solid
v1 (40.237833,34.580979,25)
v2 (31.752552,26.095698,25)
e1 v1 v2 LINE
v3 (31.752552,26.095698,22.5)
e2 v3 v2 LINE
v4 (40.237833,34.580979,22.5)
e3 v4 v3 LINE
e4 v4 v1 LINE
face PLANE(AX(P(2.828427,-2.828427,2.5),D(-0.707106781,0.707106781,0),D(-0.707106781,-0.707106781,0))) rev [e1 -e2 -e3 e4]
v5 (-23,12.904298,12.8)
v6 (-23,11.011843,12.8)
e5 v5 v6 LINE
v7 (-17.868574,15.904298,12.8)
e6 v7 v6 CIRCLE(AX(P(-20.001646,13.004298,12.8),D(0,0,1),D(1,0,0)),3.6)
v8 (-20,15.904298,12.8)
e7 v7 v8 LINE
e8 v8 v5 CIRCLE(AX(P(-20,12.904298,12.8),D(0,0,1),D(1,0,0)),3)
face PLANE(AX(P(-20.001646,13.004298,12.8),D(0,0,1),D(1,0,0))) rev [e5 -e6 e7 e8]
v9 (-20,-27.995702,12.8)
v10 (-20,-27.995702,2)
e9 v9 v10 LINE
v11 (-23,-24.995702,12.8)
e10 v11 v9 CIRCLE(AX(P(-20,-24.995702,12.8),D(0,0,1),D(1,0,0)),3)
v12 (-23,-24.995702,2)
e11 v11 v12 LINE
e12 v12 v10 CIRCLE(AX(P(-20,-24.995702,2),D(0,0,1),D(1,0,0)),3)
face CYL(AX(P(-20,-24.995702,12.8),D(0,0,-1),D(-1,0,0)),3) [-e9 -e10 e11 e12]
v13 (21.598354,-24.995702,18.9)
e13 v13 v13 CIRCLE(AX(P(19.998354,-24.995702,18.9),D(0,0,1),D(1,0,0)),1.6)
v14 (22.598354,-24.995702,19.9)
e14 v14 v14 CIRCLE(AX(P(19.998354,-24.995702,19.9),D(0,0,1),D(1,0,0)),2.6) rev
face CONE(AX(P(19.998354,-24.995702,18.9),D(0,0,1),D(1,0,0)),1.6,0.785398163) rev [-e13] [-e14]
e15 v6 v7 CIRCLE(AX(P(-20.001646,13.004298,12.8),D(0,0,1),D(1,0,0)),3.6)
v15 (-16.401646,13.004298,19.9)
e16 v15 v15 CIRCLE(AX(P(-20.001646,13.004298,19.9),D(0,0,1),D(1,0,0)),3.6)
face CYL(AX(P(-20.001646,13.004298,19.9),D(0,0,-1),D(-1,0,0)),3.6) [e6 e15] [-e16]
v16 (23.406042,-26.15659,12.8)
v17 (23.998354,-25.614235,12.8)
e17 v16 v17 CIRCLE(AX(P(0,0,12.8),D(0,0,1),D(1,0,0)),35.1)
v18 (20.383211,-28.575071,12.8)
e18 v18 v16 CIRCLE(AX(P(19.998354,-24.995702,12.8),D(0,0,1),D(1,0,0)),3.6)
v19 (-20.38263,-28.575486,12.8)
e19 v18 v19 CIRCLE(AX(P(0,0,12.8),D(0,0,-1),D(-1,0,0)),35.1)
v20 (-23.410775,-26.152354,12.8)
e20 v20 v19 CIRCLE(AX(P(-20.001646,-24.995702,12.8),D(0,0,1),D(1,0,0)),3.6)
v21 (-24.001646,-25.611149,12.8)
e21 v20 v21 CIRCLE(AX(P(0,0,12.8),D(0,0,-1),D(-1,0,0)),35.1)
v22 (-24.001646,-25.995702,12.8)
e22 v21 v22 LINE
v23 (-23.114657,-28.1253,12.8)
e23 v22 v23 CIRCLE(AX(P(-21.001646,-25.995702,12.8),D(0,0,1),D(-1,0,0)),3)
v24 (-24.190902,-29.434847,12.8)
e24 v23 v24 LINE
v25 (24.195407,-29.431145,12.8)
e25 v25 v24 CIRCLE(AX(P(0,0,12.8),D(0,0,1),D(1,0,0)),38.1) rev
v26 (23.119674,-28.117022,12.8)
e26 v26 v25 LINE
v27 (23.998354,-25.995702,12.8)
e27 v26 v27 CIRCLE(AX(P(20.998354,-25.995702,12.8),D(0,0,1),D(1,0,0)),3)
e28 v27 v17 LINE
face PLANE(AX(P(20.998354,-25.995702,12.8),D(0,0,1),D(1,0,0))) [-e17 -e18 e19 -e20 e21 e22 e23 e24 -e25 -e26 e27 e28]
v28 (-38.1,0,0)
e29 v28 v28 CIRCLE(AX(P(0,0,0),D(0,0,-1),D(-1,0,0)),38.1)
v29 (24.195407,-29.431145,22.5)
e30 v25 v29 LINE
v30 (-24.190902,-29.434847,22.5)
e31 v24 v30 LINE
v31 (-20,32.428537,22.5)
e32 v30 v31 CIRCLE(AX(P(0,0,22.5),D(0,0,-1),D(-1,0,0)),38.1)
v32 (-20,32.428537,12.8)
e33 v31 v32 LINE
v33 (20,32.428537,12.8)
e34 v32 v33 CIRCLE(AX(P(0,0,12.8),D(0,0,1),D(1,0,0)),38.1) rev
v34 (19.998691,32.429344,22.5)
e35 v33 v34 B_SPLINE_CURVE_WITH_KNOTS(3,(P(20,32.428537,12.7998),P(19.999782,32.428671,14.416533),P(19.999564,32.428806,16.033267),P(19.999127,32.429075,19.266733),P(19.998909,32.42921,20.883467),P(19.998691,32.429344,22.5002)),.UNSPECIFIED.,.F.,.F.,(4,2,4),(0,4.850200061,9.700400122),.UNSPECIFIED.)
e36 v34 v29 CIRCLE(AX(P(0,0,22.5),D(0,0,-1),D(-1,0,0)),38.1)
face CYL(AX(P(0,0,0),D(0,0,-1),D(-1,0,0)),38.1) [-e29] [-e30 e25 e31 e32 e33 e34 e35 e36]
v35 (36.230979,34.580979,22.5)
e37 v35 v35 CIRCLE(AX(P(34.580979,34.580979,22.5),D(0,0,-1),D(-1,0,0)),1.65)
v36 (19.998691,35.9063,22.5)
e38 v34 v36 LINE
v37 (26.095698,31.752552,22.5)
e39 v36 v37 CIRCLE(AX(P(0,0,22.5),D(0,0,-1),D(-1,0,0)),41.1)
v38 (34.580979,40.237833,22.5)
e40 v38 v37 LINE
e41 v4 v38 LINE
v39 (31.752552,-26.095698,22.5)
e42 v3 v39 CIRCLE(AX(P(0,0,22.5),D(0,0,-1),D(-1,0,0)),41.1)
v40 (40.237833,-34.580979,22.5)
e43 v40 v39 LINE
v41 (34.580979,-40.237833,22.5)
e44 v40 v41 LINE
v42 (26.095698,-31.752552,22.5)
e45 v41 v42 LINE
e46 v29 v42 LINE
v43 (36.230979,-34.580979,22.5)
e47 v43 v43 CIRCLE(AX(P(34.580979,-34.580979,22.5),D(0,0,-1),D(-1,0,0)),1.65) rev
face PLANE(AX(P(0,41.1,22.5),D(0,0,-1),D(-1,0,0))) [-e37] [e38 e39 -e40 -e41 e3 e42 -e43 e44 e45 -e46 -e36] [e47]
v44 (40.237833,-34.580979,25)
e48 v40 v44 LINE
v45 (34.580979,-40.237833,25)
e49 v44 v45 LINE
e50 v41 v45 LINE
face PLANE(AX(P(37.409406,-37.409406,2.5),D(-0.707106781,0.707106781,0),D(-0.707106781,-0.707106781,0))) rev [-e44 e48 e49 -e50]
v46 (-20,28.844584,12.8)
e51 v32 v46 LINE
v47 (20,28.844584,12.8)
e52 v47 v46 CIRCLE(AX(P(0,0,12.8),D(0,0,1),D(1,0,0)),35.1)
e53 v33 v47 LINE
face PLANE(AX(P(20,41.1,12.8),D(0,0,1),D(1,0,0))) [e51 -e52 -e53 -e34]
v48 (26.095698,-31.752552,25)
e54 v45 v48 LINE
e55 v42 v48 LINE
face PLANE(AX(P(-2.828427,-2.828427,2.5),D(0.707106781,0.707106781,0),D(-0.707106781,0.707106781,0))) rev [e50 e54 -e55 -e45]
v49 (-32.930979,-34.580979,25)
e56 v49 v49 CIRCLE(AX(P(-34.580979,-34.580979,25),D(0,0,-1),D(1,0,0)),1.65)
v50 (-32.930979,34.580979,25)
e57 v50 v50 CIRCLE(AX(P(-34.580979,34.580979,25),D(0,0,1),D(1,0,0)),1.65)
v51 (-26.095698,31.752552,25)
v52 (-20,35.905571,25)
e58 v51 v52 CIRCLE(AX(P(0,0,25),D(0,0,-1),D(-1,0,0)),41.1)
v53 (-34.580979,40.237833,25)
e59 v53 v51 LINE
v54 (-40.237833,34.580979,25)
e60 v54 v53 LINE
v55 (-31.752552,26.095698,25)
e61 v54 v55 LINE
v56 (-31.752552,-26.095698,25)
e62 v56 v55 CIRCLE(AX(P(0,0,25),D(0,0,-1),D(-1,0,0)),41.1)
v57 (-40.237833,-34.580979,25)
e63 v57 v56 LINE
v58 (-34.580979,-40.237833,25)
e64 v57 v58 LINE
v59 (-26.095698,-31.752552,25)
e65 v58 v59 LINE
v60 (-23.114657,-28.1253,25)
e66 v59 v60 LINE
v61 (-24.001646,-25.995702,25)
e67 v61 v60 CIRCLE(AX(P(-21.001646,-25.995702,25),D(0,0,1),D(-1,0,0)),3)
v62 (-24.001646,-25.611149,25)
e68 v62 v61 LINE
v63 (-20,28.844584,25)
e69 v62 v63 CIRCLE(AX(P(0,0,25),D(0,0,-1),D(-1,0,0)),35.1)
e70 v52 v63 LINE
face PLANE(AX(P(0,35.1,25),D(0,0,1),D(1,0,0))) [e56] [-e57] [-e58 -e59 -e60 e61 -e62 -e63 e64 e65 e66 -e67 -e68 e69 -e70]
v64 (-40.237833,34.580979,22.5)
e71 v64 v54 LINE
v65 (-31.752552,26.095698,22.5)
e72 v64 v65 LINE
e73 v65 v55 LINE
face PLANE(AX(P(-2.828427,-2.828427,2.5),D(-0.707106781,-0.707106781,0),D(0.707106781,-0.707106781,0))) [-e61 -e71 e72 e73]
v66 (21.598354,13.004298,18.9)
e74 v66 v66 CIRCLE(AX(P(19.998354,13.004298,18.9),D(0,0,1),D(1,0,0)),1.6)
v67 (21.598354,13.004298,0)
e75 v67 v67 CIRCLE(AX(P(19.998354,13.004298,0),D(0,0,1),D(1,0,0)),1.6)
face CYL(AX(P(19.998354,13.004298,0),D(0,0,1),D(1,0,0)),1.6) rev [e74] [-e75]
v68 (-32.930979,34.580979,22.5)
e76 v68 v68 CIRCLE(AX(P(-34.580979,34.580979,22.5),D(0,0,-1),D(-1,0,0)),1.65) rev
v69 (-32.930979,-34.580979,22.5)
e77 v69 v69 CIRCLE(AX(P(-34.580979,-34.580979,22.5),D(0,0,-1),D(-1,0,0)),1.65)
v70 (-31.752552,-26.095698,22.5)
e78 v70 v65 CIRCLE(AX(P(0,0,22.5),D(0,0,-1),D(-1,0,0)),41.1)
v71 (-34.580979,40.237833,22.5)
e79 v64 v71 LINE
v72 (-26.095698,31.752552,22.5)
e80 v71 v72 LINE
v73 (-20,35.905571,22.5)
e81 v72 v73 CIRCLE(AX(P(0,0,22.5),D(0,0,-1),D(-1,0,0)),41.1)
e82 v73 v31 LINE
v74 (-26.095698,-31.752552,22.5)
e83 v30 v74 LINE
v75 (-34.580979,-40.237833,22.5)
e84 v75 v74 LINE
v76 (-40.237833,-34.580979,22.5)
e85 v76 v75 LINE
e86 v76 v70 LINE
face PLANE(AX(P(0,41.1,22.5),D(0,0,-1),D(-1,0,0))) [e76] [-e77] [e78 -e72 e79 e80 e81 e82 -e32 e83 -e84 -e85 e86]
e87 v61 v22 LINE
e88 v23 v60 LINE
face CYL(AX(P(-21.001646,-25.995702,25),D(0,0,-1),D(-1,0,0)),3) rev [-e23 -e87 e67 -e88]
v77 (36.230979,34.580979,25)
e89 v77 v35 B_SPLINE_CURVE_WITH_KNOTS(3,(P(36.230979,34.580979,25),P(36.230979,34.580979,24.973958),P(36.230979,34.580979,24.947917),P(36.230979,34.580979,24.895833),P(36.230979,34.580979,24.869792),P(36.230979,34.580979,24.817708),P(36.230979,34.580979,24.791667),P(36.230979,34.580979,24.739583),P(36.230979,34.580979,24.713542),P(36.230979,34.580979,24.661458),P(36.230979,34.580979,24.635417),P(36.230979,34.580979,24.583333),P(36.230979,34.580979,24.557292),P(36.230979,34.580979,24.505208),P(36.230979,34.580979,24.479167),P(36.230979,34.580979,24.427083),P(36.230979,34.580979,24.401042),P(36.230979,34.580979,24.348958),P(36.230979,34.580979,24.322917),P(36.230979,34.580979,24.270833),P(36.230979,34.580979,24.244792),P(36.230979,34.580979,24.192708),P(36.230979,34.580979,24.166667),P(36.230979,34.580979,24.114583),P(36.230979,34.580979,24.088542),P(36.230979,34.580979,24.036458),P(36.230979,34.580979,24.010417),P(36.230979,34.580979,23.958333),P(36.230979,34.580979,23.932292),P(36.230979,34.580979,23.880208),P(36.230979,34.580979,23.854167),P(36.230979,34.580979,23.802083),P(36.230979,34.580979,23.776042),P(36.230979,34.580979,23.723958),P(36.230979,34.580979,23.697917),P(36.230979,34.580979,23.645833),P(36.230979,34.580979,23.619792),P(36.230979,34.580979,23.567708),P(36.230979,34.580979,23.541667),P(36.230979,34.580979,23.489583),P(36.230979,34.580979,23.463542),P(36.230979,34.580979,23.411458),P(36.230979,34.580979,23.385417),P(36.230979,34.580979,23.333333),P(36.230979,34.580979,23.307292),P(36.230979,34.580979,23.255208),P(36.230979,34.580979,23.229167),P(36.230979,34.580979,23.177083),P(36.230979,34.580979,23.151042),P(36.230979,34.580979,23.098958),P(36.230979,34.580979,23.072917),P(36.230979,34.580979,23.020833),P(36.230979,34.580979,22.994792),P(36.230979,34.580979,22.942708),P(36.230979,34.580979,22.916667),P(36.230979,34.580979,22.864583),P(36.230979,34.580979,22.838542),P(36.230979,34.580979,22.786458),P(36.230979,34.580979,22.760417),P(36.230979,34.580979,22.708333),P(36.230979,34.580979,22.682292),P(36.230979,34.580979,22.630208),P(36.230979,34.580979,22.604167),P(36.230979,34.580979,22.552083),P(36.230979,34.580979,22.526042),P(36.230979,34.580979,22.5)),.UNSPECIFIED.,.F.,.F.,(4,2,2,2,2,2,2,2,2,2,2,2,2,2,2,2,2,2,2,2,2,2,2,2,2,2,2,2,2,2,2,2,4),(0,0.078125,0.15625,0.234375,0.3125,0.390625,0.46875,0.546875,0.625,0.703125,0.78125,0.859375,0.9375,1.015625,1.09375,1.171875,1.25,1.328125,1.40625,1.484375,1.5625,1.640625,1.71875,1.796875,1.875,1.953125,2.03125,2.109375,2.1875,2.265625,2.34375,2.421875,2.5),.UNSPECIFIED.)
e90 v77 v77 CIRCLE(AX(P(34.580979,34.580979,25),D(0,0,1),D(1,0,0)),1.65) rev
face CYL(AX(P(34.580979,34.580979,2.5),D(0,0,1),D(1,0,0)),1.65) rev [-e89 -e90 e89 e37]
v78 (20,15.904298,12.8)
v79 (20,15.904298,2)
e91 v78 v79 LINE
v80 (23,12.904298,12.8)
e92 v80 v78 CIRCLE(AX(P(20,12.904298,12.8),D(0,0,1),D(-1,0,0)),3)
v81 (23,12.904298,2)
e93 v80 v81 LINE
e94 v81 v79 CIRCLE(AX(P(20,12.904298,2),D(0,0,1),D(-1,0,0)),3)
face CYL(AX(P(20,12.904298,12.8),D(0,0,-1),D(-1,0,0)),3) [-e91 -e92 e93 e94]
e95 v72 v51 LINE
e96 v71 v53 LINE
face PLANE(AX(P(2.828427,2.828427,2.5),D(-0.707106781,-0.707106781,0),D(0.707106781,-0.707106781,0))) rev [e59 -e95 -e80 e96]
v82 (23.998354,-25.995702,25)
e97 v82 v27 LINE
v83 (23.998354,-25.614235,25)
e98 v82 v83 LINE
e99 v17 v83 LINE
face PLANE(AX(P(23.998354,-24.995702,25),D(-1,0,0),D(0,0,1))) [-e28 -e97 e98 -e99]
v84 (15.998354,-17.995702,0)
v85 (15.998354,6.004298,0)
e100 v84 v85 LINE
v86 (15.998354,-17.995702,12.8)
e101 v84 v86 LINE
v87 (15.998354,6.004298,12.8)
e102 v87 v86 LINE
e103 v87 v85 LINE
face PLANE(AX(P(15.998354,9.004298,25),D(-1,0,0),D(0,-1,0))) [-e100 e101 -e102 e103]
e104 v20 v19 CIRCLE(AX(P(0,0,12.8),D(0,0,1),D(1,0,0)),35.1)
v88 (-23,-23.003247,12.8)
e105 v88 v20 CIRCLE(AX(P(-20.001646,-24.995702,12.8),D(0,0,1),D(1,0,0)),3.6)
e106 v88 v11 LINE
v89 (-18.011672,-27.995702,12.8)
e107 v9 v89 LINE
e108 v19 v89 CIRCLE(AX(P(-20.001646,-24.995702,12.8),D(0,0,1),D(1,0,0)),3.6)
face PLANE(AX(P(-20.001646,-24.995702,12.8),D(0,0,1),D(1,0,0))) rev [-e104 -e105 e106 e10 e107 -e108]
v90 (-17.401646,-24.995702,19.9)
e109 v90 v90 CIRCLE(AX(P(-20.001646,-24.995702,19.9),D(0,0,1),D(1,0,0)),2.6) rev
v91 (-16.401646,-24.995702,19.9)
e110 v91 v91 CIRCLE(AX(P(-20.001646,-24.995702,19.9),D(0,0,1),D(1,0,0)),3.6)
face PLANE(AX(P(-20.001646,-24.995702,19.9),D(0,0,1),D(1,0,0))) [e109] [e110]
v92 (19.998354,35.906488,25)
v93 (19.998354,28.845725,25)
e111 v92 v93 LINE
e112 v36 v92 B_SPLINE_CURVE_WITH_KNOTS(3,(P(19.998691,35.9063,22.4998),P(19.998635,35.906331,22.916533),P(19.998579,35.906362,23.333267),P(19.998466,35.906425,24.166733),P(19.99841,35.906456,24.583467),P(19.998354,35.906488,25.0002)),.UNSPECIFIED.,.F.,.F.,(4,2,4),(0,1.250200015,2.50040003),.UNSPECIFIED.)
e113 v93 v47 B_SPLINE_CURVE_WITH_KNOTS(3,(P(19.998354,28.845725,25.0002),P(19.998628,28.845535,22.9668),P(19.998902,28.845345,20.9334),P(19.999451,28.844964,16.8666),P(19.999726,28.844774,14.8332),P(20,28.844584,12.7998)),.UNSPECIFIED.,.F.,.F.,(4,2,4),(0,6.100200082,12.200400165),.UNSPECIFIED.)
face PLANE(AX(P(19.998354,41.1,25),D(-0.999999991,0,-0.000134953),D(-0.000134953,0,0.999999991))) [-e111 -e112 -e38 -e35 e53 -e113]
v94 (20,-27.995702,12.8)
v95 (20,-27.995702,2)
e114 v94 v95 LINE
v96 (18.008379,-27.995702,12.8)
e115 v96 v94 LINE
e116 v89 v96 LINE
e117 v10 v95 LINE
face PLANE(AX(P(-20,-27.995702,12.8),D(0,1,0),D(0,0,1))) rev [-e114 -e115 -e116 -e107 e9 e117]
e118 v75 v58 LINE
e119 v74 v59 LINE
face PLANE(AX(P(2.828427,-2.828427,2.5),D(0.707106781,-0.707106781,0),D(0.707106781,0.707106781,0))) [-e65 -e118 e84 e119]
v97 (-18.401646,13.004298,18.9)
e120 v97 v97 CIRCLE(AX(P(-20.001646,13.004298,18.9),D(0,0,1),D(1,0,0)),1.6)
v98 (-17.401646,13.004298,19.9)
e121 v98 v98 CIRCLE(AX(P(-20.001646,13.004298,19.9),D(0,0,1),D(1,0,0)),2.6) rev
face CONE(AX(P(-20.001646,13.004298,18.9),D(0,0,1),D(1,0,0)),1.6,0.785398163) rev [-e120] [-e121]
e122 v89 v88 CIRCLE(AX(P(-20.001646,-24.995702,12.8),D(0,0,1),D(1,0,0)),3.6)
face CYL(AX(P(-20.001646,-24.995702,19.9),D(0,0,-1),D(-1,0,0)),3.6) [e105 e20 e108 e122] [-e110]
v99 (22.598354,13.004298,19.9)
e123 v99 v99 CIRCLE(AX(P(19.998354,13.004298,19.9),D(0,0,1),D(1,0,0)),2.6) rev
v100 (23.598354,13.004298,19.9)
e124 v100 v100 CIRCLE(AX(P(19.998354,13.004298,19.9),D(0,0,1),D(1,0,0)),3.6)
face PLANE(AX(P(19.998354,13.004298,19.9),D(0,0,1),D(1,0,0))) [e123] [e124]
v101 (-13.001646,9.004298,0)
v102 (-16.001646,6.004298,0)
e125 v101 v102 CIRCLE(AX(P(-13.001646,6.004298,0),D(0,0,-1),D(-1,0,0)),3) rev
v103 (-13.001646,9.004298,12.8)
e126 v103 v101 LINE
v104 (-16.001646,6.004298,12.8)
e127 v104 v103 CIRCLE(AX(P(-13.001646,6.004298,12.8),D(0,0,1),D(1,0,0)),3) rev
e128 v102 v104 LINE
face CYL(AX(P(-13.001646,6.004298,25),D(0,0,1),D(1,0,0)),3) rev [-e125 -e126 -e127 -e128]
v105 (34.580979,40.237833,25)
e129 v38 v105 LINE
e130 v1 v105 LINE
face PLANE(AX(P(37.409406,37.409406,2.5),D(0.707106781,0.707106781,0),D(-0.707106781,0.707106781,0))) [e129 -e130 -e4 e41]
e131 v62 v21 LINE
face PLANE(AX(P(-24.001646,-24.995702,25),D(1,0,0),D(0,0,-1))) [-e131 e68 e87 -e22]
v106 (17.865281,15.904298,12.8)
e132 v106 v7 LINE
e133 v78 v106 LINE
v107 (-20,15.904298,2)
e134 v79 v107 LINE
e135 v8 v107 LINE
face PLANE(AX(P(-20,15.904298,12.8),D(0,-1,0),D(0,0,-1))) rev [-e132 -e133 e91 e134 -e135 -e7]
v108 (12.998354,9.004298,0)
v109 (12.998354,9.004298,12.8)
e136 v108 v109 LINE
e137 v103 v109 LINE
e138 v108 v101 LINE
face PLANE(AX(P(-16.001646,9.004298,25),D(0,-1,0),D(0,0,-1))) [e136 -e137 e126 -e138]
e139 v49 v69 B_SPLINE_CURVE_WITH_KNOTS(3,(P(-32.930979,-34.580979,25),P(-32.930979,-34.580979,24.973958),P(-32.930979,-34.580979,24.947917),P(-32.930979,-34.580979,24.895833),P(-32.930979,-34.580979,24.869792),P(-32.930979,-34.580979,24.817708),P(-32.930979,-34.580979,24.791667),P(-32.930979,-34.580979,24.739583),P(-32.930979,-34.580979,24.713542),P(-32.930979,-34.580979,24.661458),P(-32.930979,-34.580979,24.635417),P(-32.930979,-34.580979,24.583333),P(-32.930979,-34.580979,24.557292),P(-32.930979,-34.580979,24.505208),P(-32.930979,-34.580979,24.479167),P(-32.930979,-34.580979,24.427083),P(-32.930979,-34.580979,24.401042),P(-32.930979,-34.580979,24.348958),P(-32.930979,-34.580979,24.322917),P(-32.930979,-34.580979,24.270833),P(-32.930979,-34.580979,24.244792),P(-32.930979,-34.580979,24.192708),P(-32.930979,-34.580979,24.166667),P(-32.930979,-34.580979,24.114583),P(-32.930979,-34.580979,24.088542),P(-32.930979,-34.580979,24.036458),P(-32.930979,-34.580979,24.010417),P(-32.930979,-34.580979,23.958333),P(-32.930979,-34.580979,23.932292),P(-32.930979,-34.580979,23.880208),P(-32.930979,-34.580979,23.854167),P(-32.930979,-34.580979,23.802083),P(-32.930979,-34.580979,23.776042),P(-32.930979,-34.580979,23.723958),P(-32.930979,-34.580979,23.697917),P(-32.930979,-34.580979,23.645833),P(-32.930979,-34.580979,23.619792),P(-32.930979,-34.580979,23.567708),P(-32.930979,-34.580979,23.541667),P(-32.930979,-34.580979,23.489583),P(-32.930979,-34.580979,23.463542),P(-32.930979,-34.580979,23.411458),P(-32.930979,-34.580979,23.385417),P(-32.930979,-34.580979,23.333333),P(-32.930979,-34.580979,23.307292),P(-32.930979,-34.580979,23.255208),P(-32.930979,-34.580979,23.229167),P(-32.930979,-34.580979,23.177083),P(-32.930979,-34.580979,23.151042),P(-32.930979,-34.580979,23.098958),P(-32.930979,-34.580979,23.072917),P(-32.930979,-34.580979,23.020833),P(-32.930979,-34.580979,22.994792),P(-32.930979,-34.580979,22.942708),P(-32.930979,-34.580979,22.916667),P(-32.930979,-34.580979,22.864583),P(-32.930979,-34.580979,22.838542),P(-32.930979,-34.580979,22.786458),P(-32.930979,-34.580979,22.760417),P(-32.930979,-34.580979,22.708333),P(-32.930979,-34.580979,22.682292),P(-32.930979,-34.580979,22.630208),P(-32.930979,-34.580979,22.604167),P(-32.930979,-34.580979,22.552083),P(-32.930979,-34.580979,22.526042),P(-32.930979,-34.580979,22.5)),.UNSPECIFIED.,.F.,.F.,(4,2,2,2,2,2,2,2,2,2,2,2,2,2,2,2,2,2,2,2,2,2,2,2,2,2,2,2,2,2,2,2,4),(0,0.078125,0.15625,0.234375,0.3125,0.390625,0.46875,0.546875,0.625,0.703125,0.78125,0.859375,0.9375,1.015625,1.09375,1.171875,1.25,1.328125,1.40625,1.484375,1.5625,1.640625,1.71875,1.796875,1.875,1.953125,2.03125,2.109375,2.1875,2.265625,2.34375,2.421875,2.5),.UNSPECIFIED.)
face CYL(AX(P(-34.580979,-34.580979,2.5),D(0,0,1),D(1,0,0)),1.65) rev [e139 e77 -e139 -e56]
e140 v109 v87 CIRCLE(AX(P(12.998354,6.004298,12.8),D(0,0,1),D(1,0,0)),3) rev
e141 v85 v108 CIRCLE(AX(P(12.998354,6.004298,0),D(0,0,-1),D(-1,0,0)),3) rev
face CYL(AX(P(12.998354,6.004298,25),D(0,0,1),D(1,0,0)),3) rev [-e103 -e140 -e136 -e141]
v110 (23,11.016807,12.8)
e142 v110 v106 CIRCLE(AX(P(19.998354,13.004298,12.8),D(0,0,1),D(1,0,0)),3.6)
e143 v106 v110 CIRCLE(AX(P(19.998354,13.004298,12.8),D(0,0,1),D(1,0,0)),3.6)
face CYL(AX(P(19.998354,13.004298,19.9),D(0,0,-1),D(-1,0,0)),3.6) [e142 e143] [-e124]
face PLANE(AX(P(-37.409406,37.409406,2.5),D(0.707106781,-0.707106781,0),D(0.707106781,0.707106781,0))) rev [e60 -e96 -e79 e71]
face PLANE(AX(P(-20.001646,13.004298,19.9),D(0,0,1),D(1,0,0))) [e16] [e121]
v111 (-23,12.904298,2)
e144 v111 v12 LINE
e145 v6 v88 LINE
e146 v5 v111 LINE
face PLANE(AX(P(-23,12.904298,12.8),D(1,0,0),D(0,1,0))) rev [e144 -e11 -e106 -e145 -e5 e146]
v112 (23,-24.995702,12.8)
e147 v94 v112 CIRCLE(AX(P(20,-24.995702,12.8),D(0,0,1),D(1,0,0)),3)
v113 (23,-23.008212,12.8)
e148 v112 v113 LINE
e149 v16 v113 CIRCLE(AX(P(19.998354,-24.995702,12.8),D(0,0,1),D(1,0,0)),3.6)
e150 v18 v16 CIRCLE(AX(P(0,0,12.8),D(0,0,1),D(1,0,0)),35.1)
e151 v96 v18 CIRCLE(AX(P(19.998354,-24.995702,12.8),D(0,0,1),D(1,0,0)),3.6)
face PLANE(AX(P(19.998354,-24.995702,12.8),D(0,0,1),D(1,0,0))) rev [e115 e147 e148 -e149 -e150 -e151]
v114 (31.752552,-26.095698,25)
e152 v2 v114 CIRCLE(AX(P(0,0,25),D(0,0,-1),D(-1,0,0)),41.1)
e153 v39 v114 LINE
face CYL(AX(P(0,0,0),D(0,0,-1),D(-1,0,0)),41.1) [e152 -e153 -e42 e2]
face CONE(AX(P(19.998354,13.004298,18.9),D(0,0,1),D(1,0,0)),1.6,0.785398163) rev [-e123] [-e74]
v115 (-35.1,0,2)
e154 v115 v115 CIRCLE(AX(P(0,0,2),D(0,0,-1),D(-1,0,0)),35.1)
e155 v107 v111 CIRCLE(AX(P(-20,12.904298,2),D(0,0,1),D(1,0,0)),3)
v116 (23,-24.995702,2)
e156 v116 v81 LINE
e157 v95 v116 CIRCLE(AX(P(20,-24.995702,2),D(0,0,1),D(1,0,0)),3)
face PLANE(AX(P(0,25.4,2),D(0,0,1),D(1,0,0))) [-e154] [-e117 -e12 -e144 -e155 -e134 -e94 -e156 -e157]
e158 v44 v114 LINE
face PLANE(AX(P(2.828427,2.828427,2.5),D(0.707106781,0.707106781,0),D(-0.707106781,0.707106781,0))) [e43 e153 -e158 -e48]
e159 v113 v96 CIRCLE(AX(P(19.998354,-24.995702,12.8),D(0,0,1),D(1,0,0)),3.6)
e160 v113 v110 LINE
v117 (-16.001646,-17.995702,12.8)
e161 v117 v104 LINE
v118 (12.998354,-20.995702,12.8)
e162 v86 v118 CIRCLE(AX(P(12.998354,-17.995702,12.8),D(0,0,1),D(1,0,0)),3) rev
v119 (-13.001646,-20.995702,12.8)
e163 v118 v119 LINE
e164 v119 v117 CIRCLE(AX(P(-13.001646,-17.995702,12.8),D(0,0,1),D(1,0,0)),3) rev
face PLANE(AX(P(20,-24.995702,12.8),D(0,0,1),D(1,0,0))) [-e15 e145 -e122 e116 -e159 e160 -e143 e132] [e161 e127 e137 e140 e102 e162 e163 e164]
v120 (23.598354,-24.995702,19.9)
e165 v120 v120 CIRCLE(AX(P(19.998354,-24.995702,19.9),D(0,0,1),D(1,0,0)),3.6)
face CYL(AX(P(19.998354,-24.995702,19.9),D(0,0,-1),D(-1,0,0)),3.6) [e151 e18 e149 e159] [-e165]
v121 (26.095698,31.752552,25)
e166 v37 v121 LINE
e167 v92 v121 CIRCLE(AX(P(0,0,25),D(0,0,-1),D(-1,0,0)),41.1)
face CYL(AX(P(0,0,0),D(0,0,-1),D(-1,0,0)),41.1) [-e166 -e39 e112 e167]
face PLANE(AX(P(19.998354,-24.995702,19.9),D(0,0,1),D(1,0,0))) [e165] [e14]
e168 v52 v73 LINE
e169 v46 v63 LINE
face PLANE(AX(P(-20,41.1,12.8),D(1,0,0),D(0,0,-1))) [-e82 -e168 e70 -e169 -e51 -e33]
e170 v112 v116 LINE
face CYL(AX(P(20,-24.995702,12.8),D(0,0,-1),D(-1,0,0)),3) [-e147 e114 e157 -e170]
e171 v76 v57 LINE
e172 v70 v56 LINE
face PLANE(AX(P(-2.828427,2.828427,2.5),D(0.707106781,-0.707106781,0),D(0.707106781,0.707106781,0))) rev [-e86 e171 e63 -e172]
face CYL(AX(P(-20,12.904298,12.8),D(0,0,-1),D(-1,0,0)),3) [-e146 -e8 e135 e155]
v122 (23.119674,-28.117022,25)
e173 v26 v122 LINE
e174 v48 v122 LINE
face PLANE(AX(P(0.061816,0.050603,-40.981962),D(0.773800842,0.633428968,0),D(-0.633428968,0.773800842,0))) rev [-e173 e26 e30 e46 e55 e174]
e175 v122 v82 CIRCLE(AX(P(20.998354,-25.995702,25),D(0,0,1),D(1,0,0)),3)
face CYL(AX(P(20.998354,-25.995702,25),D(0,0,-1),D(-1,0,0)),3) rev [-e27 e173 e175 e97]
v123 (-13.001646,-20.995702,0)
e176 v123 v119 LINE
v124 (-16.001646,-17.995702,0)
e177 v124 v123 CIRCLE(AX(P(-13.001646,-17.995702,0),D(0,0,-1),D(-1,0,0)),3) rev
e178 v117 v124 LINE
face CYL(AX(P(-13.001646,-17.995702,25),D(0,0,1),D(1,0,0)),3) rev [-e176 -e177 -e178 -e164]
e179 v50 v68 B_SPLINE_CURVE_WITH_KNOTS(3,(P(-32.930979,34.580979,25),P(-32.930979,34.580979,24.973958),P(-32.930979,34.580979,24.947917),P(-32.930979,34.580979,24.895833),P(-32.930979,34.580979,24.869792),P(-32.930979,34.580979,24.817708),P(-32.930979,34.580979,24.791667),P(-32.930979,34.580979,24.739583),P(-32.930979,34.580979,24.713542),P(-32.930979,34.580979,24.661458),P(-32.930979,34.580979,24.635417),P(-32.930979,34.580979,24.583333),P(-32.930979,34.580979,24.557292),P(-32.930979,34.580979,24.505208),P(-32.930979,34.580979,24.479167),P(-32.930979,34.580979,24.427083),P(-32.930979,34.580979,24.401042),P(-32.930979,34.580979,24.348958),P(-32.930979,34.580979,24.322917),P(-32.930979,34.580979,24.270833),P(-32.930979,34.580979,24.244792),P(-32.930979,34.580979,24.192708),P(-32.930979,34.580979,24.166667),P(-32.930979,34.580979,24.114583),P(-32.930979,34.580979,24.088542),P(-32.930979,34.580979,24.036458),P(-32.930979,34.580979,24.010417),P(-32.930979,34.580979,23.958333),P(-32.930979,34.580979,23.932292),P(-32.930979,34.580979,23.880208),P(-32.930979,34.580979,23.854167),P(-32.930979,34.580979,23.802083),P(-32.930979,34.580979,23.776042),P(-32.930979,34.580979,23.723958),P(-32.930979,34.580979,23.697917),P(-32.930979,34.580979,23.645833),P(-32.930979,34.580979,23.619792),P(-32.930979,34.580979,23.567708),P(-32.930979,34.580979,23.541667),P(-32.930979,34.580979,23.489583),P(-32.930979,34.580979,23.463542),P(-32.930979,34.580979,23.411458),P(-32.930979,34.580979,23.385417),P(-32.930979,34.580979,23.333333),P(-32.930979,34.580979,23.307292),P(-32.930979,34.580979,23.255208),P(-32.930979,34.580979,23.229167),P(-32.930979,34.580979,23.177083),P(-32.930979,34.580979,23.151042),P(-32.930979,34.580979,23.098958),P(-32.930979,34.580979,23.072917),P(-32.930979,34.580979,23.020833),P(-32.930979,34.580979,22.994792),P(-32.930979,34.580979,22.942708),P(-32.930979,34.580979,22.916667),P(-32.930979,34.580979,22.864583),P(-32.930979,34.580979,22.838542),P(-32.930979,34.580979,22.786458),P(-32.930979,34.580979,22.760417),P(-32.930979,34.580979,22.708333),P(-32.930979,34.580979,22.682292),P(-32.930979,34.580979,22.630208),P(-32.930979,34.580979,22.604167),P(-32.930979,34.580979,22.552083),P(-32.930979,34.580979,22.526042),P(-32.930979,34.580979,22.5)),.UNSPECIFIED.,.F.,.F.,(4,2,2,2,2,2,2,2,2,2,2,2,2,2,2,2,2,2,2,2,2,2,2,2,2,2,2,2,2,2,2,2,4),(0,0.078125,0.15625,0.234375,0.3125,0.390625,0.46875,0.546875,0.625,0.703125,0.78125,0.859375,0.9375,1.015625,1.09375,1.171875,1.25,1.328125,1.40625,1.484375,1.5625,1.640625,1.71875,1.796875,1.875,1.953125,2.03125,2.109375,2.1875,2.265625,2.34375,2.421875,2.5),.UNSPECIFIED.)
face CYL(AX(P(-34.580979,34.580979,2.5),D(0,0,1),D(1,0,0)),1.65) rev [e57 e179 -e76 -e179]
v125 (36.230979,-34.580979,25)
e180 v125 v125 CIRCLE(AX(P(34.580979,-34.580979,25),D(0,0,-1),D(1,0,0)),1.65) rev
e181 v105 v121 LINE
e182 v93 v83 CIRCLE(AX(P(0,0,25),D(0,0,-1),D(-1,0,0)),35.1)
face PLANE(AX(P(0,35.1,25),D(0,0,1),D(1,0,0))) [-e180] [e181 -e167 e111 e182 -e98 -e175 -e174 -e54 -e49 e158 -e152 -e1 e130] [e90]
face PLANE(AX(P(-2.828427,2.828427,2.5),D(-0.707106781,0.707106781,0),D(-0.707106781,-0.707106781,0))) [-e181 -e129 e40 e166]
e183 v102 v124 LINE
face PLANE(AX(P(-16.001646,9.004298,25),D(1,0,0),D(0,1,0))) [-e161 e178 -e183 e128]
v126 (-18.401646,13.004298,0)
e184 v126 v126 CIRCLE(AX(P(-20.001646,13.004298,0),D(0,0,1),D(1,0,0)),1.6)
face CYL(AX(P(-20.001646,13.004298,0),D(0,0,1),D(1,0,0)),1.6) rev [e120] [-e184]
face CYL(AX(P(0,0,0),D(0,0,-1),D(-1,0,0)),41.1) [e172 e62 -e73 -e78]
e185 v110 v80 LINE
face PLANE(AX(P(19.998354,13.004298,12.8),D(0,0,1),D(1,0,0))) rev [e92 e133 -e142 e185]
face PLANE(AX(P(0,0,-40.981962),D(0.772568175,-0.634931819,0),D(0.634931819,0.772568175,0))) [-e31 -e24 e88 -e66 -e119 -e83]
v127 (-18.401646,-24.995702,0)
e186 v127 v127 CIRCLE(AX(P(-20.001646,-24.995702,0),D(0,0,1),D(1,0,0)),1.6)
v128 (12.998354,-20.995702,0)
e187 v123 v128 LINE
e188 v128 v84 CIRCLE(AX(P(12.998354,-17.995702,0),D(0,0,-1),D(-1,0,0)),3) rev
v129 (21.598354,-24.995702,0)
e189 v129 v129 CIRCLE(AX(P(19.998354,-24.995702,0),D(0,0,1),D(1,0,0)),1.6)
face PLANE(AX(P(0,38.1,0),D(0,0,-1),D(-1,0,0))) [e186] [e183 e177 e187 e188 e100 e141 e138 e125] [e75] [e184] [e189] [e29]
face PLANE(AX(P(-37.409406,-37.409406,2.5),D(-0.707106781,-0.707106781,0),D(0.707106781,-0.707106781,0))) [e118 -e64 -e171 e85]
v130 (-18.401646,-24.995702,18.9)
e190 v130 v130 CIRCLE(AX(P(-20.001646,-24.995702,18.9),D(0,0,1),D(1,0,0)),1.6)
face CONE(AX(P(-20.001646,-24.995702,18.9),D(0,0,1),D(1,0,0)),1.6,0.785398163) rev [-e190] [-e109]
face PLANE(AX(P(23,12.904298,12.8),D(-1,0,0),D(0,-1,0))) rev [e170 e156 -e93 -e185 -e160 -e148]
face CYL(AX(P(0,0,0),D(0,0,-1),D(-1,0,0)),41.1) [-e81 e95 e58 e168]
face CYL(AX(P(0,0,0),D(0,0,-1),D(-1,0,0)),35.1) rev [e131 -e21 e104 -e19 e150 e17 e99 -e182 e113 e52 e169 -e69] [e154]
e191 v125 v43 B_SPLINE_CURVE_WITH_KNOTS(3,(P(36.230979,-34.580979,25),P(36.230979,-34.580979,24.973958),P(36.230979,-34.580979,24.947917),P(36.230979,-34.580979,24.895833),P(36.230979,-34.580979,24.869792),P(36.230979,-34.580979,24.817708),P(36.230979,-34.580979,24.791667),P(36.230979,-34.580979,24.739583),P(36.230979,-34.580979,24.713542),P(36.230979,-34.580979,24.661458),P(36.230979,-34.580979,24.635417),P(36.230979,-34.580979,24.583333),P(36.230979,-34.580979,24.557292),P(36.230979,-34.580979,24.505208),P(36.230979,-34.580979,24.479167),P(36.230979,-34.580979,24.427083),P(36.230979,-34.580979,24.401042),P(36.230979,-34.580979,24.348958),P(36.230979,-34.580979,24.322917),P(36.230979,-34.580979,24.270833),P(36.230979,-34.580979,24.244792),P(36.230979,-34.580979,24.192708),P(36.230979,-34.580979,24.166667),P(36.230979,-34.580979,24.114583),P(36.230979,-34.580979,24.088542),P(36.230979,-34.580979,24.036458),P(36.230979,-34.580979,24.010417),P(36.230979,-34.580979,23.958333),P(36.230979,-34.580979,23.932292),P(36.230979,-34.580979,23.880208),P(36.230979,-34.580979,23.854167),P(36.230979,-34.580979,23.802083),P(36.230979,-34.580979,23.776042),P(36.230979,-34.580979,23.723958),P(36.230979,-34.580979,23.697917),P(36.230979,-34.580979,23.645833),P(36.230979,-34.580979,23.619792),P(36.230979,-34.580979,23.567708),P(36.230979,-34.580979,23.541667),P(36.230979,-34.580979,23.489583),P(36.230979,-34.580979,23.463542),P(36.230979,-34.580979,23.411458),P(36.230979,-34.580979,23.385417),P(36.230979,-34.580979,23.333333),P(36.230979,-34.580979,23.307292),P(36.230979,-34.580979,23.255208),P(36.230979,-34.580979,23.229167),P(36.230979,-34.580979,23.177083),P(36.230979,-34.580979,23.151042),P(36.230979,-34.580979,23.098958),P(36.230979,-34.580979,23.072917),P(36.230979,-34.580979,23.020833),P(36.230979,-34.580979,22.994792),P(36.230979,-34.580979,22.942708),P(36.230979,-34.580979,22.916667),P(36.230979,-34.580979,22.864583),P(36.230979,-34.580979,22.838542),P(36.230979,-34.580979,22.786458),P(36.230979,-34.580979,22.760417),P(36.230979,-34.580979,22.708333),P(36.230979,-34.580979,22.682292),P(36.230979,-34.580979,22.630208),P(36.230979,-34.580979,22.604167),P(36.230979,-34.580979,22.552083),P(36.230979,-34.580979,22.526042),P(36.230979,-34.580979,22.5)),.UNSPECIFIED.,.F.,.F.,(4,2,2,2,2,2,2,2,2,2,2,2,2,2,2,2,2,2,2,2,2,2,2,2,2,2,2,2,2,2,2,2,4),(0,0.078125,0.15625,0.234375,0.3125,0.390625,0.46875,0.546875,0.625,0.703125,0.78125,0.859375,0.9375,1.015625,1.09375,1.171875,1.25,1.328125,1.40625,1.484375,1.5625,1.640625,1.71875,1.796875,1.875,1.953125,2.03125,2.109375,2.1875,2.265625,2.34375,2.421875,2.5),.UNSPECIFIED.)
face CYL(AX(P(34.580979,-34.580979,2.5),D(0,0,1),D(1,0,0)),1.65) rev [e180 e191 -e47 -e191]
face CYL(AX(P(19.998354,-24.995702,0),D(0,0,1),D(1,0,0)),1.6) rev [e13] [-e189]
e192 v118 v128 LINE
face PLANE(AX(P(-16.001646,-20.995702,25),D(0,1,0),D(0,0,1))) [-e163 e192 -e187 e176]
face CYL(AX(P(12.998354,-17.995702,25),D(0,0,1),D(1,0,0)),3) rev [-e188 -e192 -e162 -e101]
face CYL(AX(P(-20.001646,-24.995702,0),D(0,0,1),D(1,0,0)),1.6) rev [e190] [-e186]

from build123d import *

# Parameters (mm, degrees)
BOSS_EXTRUDE1_DEPTH     = 10.8
CUT_EXTRUDE1_DEPTH      = 63.509359299
CUT_EXTRUDE1_DEPTH_BACK = 63.509359299
SKETCH14_W              = 32
SKETCH14_H              = 30
CUT_EXTRUDE3_DEPTH      = 60.51688836
FILLET1_R               = 3
SKETCH16_R              = 1.6
CUT_EXTRUDE2_DEPTH      = 60.51688836
CUT_EXTRUDE4_DEPTH      = 75.590213715
BOSS_EXTRUDE3_START     = -2.5
SKETCH22_R              = 1.65
BOSS_EXTRUDE3_DEPTH     = 2.5
BOSS_EXTRUDE4_START     = 7.1
SKETCH24_R              = 3.6
SKETCH24_R_2            = 1.6
BOSS_EXTRUDE4_DEPTH     = 7.1
CHAMFER1_SIZE           = 1
CUT_EXTRUDE5_START      = -12.2
CUT_EXTRUDE5_DEPTH      = 12.2


# Read off the part's stored shape, not the designer's step: Cut-Extrude5
with BuildPart() as part:
    # Sketch6 → Revolve1 (revolve)
    with BuildSketch(Plane(origin=(0, 0, 0), x_dir=(0, 0, -1), z_dir=(1, 0, 0)), mode=Mode.PRIVATE) as revolve1_sk:
        Polygon((-2, 25.4), (-2, 35.1), (-25, 35.1), (-25, 37.95), (-25, 41.1), (-22.5, 41.1), (-22.5, 38.1), (0, 38.1), (0, 25.4), (0, 0), (-2, 0), align=None)
    revolve(revolve1_sk.sketch.rotate(Axis((0, 0, 0), (0, 0, 1)), 90), axis=Axis((0, 0, 0), (0, 0, 1)))

    # Sketch15 → Boss-Extrude1 (add)
    with BuildSketch(Plane.XY.offset(2)):
        with BuildLine():
            Line((-20, 15.904297927), (20, 15.904297927))
            ThreePointArc((20, 15.904297927), (22.121320344, 15.02561827), (23, 12.904297927))
            Line((23, 12.904297927), (23, -24.995702073))
            ThreePointArc((23, -24.995702073), (22.121320344, -27.117022417), (20, -27.995702073))
            Line((20, -27.995702073), (-20, -27.995702073))
            ThreePointArc((-20, -27.995702073), (-22.121320344, -27.117022417), (-23, -24.995702073))
            Line((-23, -24.995702073), (-23, 12.904297927))
            ThreePointArc((-23, 12.904297927), (-22.121320344, 15.02561827), (-20, 15.904297927))
        make_face()
    extrude(amount=BOSS_EXTRUDE1_DEPTH)

    # Sketch14 → Cut-Extrude1 (cut, two sides: drawn at the far end of the back side and taken through both)
    with BuildSketch(Plane.XY.offset(2).offset(-CUT_EXTRUDE1_DEPTH_BACK)):
        with Locations((-0.00164643, -5.995702073)):
            Rectangle(SKETCH14_W, SKETCH14_H)
    extrude(amount=CUT_EXTRUDE1_DEPTH + CUT_EXTRUDE1_DEPTH_BACK, mode=Mode.SUBTRACT)

    # Sketch18 → Cut-Extrude3 (cut, through all)
    with BuildSketch(Plane.XY.offset(12.8)):
        with BuildLine():
            Line((19.99835357, -24.995702073), (23.99835357, -24.995702073))
            Line((23.99835357, -24.995702073), (23.99835357, -25.995702073))
            ThreePointArc((23.99835357, -25.995702073), (23.119673914, -28.117022417), (20.99835357, -28.995702073))
            Line((20.99835357, -28.995702073), (19.99835357, -28.995702073))
            Line((19.99835357, -28.995702073), (19.99835357, -24.995702073))
        make_face()
        with BuildLine():
            Line((-20.00164643, -24.995702073), (-24.00164643, -24.995702073))
            Line((-24.00164643, -24.995702073), (-24.00164643, -25.995702073))
            ThreePointArc((-24.00164643, -25.995702073), (-23.122966774, -28.117022417), (-21.00164643, -28.995702073))
            Line((-21.00164643, -28.995702073), (-20.00164643, -28.995702073))
            Line((-20.00164643, -28.995702073), (-20.00164643, -24.995702073))
        make_face()
    extrude(amount=CUT_EXTRUDE3_DEPTH, mode=Mode.SUBTRACT)

    # Fillet1
    fillet1_edges = [part.edges().sort_by_distance(p)[0] for p in [
        (-16.00164643, 9.004297927, 6.4),
        (-16.00164643, -20.995702073, 6.4),
        (15.99835357, -20.995702073, 6.4),
        (15.99835357, 9.004297927, 6.4),
    ]]
    fillet(fillet1_edges, radius=FILLET1_R)

    # Sketch16 → Cut-Extrude2 (cut, through all)
    with BuildSketch(Plane.XY.offset(12.8)):
        with Locations((-20.00164643, 13.004297927)):
            Circle(SKETCH16_R)
        with Locations((-20.00164643, -24.995702073)):
            Circle(SKETCH16_R)
        with Locations((19.99835357, -24.995702073)):
            Circle(SKETCH16_R)
        with Locations((19.99835357, 13.004297927)):
            Circle(SKETCH16_R)
    extrude(amount=-CUT_EXTRUDE2_DEPTH, mode=Mode.SUBTRACT)

    # Sketch20 → Cut-Extrude4 (cut, through all)
    with BuildSketch(Plane(origin=(0, 15.904297927, 0), x_dir=(1, 0, 0), z_dir=(0, 1, 0))):
        Polygon((20, -12.8), (-20, -12.8), (-20, -25), (19.99835357, -25), align=None)
    extrude(amount=CUT_EXTRUDE4_DEPTH, mode=Mode.SUBTRACT)

    # Sketch22 → Boss-Extrude3 (add)
    # profile 1 of 2: a face of its own
    with BuildSketch(Plane.XY.offset(25).offset(BOSS_EXTRUDE3_START)):
        with BuildLine():
            Line((-40.237833378, 34.580979128), (-31.752552003, 26.095697754))
            ThreePointArc((-31.752552003, 26.095697754), (-29.062088707, 29.062088707), (-26.095697754, 31.752552003))
            Line((-26.095697754, 31.752552003), (-34.580979128, 40.237833378))
            Line((-34.580979128, 40.237833378), (-40.237833378, 34.580979128))
        make_face()
        with Locations((-34.580979128, 34.580979128)):
            Circle(SKETCH22_R, mode=Mode.SUBTRACT)
    # profile 2 of 2: a face of its own
    with BuildSketch(Plane.XY.offset(25).offset(BOSS_EXTRUDE3_START)):
        with BuildLine():
            ThreePointArc((26.095697754, 31.752552003), (29.062088707, 29.062088707), (31.752552003, 26.095697754))
            Line((31.752552003, 26.095697754), (40.237833378, 34.580979128))
            Line((40.237833378, 34.580979128), (34.580979128, 40.237833378))
            Line((34.580979128, 40.237833378), (26.095697754, 31.752552003))
        make_face()
        with Locations((34.580979128, 34.580979128)):
            Circle(SKETCH22_R, mode=Mode.SUBTRACT)
    boss_extrude3 = extrude(amount=BOSS_EXTRUDE3_DEPTH)

    # Sketch24 → Boss-Extrude4 (add)
    # profile 1 of 4: a face of its own
    with BuildSketch(Plane.XY.offset(12.8).offset(BOSS_EXTRUDE4_START)):
        with Locations(Location((-20.00164643, 13.004297927, 0), (0, 0, 213.6046846))):
            Circle(SKETCH24_R)
        with Locations((-20.00164643, 13.004297927)):
            Circle(SKETCH24_R_2, mode=Mode.SUBTRACT)
    # profile 2 of 4: a face of its own
    with BuildSketch(Plane.XY.offset(12.8).offset(BOSS_EXTRUDE4_START)):
        with Locations(Location((19.99835357, 13.004297927, 0), (0, 0, 126.336057515))):
            Circle(SKETCH24_R)
        with Locations((19.99835357, 13.004297927)):
            Circle(SKETCH24_R_2, mode=Mode.SUBTRACT)
    # profile 3 of 4: a face of its own
    with BuildSketch(Plane.XY.offset(12.8).offset(BOSS_EXTRUDE4_START)):
        with Locations(Location((-20.00164643, -24.995702073, 0), (0, 0, 198.741091164))):
            Circle(SKETCH24_R)
        with Locations((-20.00164643, -24.995702073)):
            Circle(SKETCH24_R_2, mode=Mode.SUBTRACT)
    # profile 4 of 4: a face of its own
    with BuildSketch(Plane.XY.offset(12.8).offset(BOSS_EXTRUDE4_START)):
        with Locations(Location((19.99835357, -24.995702073, 0), (0, 0, 236.442690237))):
            Circle(SKETCH24_R)
        with Locations((19.99835357, -24.995702073)):
            Circle(SKETCH24_R_2, mode=Mode.SUBTRACT)
    extrude(amount=-BOSS_EXTRUDE4_DEPTH)

    # Chamfer1
    chamfer1_edges = [part.edges().sort_by_distance(p)[0] for p in [
        (-21.60164643, 13.004297927, 19.9),
        (18.39835357, 13.004297927, 19.9),
        (-21.60164643, -24.995702073, 19.9),
        (18.39835357, -24.995702073, 19.9),
    ]]
    chamfer(chamfer1_edges, length=CHAMFER1_SIZE)

    # Mirror1: Boss-Extrude3 across plane
    add(boss_extrude3.mirror(Plane.ZX))

    # Cut-Extrude5 outline → Cut-Extrude5 (cut)
    with BuildSketch(Plane.XY.offset(25).offset(CUT_EXTRUDE5_START)):
        with BuildLine():
            ThreePointArc((-26.095697754, -31.752552003), (0, -41.1), (26.095697754, -31.752552003))
            Line((26.095697754, -31.752552003), (23.119673914, -28.117022417))
            ThreePointArc((23.119673914, -28.117022417), (22.146403867, -28.767340671), (20.99835357, -28.995702073))
            Line((20.99835357, -28.995702073), (19.99835357, -28.995702073))
            Line((19.99835357, -28.995702073), (19.99835357, -28.845725064))
            ThreePointArc((19.99835357, -28.845725064), (-0.002003485, -35.099999943), (-20.00164643, -28.843441891))
            Line((-20.00164643, -28.843441891), (-20.00164643, -28.995702073))
            Line((-20.00164643, -28.995702073), (-21.00164643, -28.995702073))
            ThreePointArc((-21.00164643, -28.995702073), (-22.144276194, -28.769579725), (-23.11465654, -28.125300222))
            Line((-23.11465654, -28.125300222), (-26.095697754, -31.752552003))
        make_face()
    extrude(amount=CUT_EXTRUDE5_DEPTH, mode=Mode.SUBTRACT)


solid = part.part
